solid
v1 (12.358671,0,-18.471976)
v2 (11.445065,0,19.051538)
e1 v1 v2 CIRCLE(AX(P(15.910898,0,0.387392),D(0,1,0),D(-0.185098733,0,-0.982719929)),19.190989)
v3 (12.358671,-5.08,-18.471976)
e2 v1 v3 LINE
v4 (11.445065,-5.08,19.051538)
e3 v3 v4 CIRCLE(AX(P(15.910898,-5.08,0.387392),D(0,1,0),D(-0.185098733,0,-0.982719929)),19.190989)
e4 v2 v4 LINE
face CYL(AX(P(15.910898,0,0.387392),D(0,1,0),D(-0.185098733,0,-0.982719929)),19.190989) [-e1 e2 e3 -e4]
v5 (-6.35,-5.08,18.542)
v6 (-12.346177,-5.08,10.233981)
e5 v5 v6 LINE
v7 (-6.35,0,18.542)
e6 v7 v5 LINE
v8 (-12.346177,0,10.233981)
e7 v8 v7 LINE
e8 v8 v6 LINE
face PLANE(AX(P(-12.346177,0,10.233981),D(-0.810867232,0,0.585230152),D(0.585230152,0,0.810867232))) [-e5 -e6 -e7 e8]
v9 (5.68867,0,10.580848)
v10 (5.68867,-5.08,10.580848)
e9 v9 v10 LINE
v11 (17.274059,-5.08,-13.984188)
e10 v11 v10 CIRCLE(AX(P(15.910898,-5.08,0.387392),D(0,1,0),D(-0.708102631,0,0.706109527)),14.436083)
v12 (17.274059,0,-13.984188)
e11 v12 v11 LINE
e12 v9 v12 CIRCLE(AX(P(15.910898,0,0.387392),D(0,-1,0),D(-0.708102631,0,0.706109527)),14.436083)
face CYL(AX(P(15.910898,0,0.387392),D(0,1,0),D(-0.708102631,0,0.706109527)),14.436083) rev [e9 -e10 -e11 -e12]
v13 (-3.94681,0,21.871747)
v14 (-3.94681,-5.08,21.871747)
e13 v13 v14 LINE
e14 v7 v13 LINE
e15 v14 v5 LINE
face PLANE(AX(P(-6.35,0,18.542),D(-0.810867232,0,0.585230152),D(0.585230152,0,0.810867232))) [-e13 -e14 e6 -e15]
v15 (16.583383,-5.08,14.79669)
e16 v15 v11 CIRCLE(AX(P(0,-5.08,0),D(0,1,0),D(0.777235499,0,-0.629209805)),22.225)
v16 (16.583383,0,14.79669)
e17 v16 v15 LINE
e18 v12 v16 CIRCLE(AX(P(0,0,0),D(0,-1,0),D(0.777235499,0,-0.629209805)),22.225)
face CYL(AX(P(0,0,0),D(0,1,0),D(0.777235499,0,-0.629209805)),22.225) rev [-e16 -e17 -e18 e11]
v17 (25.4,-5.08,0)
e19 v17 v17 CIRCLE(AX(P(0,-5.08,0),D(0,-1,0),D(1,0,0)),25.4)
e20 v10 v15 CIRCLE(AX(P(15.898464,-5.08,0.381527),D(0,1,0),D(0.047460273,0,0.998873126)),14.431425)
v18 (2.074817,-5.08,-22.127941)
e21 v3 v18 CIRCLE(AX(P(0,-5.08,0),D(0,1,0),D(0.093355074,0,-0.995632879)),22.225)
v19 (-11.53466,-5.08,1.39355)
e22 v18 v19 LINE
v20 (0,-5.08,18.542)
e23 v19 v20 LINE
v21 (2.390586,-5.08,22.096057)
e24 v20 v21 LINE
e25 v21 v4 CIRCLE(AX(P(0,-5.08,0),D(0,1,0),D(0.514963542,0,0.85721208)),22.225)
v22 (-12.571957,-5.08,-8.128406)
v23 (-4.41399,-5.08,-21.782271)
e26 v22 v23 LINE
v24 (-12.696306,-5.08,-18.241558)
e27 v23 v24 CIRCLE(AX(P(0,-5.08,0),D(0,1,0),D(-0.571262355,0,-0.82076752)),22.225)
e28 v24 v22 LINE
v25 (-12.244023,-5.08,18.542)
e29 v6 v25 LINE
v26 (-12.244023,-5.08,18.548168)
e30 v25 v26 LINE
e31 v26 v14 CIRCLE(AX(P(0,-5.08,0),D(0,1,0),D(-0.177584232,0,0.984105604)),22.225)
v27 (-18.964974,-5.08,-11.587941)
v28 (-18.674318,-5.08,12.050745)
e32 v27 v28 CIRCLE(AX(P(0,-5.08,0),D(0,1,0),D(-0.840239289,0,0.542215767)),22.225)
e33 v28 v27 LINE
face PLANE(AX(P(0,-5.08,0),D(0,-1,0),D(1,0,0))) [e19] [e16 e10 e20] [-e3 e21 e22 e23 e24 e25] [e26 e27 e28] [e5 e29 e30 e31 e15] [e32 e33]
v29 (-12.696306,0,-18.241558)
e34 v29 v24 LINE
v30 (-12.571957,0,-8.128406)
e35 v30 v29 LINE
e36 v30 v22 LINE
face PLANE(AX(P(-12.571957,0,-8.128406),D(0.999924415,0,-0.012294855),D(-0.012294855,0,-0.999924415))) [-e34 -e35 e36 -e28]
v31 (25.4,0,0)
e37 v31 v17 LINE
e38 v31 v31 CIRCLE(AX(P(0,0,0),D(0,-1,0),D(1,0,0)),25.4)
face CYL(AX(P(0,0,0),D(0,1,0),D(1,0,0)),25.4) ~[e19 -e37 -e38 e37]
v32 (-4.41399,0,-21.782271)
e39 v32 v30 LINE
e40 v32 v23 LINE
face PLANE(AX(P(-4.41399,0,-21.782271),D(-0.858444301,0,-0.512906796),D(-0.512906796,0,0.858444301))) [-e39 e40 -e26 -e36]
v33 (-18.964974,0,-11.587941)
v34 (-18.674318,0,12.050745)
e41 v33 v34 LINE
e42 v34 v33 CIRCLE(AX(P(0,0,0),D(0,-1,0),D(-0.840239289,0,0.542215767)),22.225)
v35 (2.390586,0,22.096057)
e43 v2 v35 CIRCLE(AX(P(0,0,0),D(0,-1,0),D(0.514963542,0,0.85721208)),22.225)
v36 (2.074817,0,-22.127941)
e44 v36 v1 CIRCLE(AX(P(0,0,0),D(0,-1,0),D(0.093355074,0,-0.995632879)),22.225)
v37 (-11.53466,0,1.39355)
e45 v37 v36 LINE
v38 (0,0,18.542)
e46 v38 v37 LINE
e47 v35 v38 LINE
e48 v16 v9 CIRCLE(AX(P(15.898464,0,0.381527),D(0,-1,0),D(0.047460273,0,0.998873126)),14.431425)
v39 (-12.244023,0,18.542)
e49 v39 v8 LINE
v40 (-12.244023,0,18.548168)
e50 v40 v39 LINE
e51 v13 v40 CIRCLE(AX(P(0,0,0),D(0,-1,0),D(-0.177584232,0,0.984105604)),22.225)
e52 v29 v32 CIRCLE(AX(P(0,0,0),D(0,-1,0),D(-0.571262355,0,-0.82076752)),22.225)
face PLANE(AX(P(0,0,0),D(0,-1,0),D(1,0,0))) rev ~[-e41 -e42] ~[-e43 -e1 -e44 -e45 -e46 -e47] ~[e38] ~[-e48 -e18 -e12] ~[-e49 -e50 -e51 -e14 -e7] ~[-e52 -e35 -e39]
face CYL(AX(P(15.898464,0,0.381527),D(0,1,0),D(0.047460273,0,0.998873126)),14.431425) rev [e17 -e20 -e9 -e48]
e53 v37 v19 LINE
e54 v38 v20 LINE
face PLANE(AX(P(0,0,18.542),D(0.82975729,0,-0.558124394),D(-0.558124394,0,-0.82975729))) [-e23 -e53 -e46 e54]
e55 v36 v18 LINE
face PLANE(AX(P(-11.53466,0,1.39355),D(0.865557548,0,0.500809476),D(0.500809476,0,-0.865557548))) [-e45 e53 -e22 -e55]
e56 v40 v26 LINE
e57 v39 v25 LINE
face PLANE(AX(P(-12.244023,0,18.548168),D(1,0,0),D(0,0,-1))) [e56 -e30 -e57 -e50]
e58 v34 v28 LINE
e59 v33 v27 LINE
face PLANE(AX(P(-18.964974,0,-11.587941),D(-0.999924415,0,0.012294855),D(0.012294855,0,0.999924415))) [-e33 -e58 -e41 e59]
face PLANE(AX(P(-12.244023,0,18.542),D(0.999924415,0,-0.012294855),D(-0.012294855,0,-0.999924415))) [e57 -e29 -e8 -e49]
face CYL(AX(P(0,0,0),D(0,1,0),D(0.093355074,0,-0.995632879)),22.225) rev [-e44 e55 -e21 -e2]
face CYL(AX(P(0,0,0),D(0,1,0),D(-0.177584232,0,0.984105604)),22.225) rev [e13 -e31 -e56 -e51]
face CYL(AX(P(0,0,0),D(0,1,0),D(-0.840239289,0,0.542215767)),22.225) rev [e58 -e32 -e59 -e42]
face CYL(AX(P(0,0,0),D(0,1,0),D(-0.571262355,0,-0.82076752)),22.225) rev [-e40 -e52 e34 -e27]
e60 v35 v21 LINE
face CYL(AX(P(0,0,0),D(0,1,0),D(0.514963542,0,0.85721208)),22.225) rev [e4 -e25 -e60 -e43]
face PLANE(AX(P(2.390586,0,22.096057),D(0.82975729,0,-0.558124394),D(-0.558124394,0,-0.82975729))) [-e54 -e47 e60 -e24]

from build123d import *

# Parameters (mm, degrees)
F1_R     = 25.4
F2_DEPTH = 5.08
F3_DEPTH = 25.4


with BuildPart() as f2:
    # F1 (on face) → F2 (new body)
    with BuildSketch(Plane.XZ):
        Circle(F1_R)
    extrude(amount=F2_DEPTH)

    # F0 (on Front) → F3 (cut)
    with BuildSketch(Plane.XZ):
        with BuildLine():
            Line((-18.9649743836, -11.5879407846), (-18.6743181879, 12.0507454217))
            ThreePointArc((-18.6743181879, 12.0507454217), (-22.2233201325, 0.2732531593), (-18.9649743836, -11.5879407846))
        make_face()
        with BuildLine():
            Line((-12.2440231208, 18.5481676404), (-12.2440231208, 18.542))
            Line((-12.2440231208, 18.542), (-12.3461767338, 10.2339809879))
            Line((-12.3461767338, 10.2339809879), (-6.35, 18.542))
            Line((-6.35, 18.542), (-3.9468095651, 21.8717470554))
            ThreePointArc((-3.9468095651, 21.8717470554), (-8.2642187046, 20.6313672403), (-12.2440231208, 18.5481676404))
        make_face()
        with BuildLine():
            Line((2.3905855561, 22.0960567907), (0, 18.542))
            Line((0, 18.542), (-11.534660226, 1.393549738))
            Line((-11.534660226, 1.393549738), (0, -18.542))
            Line((0, -18.542), (2.0748165247, -22.1279407399))
            ThreePointArc((2.0748165247, -22.1279407399), (7.4446563645, -20.9410533788), (12.3586706752, -18.4719756426))
            ThreePointArc((12.3586706752, -18.4719756426), (-3.2744047046, -0.079723759), (11.4450647322, 19.0515384753))
            ThreePointArc((11.4450647322, 19.0515384753), (7.0833309726, 21.0660164087), (2.3905855561, 22.0960567907))
        make_face()
        with BuildLine():
            Line((-12.5719566873, -8.1284057478), (-12.6963058315, -18.2415581361))
            ThreePointArc((-12.6963058315, -18.2415581361), (-8.7364017757, -20.4358975583), (-4.4139898466, -21.782270741))
            Line((-4.4139898466, -21.782270741), (-6.35, -18.542))
            Line((-6.35, -18.542), (-12.5719566873, -8.1284057478))
        make_face()
        with BuildLine():
            ThreePointArc((5.688669798, 10.580847501), (2.8540606181, -5.7704887525), (17.2740589748, -13.9841879112))
            ThreePointArc((17.2740589748, -13.9841879112), (22.2186031718, 0.533196112), (16.5833831495, 14.7966897756))
            ThreePointArc((16.5833831495, 14.7966897756), (10.6903796192, 13.8404233779), (5.688669798, 10.580847501))
        make_face()
    extrude(amount=F3_DEPTH, mode=Mode.SUBTRACT)


solid = f2.part
